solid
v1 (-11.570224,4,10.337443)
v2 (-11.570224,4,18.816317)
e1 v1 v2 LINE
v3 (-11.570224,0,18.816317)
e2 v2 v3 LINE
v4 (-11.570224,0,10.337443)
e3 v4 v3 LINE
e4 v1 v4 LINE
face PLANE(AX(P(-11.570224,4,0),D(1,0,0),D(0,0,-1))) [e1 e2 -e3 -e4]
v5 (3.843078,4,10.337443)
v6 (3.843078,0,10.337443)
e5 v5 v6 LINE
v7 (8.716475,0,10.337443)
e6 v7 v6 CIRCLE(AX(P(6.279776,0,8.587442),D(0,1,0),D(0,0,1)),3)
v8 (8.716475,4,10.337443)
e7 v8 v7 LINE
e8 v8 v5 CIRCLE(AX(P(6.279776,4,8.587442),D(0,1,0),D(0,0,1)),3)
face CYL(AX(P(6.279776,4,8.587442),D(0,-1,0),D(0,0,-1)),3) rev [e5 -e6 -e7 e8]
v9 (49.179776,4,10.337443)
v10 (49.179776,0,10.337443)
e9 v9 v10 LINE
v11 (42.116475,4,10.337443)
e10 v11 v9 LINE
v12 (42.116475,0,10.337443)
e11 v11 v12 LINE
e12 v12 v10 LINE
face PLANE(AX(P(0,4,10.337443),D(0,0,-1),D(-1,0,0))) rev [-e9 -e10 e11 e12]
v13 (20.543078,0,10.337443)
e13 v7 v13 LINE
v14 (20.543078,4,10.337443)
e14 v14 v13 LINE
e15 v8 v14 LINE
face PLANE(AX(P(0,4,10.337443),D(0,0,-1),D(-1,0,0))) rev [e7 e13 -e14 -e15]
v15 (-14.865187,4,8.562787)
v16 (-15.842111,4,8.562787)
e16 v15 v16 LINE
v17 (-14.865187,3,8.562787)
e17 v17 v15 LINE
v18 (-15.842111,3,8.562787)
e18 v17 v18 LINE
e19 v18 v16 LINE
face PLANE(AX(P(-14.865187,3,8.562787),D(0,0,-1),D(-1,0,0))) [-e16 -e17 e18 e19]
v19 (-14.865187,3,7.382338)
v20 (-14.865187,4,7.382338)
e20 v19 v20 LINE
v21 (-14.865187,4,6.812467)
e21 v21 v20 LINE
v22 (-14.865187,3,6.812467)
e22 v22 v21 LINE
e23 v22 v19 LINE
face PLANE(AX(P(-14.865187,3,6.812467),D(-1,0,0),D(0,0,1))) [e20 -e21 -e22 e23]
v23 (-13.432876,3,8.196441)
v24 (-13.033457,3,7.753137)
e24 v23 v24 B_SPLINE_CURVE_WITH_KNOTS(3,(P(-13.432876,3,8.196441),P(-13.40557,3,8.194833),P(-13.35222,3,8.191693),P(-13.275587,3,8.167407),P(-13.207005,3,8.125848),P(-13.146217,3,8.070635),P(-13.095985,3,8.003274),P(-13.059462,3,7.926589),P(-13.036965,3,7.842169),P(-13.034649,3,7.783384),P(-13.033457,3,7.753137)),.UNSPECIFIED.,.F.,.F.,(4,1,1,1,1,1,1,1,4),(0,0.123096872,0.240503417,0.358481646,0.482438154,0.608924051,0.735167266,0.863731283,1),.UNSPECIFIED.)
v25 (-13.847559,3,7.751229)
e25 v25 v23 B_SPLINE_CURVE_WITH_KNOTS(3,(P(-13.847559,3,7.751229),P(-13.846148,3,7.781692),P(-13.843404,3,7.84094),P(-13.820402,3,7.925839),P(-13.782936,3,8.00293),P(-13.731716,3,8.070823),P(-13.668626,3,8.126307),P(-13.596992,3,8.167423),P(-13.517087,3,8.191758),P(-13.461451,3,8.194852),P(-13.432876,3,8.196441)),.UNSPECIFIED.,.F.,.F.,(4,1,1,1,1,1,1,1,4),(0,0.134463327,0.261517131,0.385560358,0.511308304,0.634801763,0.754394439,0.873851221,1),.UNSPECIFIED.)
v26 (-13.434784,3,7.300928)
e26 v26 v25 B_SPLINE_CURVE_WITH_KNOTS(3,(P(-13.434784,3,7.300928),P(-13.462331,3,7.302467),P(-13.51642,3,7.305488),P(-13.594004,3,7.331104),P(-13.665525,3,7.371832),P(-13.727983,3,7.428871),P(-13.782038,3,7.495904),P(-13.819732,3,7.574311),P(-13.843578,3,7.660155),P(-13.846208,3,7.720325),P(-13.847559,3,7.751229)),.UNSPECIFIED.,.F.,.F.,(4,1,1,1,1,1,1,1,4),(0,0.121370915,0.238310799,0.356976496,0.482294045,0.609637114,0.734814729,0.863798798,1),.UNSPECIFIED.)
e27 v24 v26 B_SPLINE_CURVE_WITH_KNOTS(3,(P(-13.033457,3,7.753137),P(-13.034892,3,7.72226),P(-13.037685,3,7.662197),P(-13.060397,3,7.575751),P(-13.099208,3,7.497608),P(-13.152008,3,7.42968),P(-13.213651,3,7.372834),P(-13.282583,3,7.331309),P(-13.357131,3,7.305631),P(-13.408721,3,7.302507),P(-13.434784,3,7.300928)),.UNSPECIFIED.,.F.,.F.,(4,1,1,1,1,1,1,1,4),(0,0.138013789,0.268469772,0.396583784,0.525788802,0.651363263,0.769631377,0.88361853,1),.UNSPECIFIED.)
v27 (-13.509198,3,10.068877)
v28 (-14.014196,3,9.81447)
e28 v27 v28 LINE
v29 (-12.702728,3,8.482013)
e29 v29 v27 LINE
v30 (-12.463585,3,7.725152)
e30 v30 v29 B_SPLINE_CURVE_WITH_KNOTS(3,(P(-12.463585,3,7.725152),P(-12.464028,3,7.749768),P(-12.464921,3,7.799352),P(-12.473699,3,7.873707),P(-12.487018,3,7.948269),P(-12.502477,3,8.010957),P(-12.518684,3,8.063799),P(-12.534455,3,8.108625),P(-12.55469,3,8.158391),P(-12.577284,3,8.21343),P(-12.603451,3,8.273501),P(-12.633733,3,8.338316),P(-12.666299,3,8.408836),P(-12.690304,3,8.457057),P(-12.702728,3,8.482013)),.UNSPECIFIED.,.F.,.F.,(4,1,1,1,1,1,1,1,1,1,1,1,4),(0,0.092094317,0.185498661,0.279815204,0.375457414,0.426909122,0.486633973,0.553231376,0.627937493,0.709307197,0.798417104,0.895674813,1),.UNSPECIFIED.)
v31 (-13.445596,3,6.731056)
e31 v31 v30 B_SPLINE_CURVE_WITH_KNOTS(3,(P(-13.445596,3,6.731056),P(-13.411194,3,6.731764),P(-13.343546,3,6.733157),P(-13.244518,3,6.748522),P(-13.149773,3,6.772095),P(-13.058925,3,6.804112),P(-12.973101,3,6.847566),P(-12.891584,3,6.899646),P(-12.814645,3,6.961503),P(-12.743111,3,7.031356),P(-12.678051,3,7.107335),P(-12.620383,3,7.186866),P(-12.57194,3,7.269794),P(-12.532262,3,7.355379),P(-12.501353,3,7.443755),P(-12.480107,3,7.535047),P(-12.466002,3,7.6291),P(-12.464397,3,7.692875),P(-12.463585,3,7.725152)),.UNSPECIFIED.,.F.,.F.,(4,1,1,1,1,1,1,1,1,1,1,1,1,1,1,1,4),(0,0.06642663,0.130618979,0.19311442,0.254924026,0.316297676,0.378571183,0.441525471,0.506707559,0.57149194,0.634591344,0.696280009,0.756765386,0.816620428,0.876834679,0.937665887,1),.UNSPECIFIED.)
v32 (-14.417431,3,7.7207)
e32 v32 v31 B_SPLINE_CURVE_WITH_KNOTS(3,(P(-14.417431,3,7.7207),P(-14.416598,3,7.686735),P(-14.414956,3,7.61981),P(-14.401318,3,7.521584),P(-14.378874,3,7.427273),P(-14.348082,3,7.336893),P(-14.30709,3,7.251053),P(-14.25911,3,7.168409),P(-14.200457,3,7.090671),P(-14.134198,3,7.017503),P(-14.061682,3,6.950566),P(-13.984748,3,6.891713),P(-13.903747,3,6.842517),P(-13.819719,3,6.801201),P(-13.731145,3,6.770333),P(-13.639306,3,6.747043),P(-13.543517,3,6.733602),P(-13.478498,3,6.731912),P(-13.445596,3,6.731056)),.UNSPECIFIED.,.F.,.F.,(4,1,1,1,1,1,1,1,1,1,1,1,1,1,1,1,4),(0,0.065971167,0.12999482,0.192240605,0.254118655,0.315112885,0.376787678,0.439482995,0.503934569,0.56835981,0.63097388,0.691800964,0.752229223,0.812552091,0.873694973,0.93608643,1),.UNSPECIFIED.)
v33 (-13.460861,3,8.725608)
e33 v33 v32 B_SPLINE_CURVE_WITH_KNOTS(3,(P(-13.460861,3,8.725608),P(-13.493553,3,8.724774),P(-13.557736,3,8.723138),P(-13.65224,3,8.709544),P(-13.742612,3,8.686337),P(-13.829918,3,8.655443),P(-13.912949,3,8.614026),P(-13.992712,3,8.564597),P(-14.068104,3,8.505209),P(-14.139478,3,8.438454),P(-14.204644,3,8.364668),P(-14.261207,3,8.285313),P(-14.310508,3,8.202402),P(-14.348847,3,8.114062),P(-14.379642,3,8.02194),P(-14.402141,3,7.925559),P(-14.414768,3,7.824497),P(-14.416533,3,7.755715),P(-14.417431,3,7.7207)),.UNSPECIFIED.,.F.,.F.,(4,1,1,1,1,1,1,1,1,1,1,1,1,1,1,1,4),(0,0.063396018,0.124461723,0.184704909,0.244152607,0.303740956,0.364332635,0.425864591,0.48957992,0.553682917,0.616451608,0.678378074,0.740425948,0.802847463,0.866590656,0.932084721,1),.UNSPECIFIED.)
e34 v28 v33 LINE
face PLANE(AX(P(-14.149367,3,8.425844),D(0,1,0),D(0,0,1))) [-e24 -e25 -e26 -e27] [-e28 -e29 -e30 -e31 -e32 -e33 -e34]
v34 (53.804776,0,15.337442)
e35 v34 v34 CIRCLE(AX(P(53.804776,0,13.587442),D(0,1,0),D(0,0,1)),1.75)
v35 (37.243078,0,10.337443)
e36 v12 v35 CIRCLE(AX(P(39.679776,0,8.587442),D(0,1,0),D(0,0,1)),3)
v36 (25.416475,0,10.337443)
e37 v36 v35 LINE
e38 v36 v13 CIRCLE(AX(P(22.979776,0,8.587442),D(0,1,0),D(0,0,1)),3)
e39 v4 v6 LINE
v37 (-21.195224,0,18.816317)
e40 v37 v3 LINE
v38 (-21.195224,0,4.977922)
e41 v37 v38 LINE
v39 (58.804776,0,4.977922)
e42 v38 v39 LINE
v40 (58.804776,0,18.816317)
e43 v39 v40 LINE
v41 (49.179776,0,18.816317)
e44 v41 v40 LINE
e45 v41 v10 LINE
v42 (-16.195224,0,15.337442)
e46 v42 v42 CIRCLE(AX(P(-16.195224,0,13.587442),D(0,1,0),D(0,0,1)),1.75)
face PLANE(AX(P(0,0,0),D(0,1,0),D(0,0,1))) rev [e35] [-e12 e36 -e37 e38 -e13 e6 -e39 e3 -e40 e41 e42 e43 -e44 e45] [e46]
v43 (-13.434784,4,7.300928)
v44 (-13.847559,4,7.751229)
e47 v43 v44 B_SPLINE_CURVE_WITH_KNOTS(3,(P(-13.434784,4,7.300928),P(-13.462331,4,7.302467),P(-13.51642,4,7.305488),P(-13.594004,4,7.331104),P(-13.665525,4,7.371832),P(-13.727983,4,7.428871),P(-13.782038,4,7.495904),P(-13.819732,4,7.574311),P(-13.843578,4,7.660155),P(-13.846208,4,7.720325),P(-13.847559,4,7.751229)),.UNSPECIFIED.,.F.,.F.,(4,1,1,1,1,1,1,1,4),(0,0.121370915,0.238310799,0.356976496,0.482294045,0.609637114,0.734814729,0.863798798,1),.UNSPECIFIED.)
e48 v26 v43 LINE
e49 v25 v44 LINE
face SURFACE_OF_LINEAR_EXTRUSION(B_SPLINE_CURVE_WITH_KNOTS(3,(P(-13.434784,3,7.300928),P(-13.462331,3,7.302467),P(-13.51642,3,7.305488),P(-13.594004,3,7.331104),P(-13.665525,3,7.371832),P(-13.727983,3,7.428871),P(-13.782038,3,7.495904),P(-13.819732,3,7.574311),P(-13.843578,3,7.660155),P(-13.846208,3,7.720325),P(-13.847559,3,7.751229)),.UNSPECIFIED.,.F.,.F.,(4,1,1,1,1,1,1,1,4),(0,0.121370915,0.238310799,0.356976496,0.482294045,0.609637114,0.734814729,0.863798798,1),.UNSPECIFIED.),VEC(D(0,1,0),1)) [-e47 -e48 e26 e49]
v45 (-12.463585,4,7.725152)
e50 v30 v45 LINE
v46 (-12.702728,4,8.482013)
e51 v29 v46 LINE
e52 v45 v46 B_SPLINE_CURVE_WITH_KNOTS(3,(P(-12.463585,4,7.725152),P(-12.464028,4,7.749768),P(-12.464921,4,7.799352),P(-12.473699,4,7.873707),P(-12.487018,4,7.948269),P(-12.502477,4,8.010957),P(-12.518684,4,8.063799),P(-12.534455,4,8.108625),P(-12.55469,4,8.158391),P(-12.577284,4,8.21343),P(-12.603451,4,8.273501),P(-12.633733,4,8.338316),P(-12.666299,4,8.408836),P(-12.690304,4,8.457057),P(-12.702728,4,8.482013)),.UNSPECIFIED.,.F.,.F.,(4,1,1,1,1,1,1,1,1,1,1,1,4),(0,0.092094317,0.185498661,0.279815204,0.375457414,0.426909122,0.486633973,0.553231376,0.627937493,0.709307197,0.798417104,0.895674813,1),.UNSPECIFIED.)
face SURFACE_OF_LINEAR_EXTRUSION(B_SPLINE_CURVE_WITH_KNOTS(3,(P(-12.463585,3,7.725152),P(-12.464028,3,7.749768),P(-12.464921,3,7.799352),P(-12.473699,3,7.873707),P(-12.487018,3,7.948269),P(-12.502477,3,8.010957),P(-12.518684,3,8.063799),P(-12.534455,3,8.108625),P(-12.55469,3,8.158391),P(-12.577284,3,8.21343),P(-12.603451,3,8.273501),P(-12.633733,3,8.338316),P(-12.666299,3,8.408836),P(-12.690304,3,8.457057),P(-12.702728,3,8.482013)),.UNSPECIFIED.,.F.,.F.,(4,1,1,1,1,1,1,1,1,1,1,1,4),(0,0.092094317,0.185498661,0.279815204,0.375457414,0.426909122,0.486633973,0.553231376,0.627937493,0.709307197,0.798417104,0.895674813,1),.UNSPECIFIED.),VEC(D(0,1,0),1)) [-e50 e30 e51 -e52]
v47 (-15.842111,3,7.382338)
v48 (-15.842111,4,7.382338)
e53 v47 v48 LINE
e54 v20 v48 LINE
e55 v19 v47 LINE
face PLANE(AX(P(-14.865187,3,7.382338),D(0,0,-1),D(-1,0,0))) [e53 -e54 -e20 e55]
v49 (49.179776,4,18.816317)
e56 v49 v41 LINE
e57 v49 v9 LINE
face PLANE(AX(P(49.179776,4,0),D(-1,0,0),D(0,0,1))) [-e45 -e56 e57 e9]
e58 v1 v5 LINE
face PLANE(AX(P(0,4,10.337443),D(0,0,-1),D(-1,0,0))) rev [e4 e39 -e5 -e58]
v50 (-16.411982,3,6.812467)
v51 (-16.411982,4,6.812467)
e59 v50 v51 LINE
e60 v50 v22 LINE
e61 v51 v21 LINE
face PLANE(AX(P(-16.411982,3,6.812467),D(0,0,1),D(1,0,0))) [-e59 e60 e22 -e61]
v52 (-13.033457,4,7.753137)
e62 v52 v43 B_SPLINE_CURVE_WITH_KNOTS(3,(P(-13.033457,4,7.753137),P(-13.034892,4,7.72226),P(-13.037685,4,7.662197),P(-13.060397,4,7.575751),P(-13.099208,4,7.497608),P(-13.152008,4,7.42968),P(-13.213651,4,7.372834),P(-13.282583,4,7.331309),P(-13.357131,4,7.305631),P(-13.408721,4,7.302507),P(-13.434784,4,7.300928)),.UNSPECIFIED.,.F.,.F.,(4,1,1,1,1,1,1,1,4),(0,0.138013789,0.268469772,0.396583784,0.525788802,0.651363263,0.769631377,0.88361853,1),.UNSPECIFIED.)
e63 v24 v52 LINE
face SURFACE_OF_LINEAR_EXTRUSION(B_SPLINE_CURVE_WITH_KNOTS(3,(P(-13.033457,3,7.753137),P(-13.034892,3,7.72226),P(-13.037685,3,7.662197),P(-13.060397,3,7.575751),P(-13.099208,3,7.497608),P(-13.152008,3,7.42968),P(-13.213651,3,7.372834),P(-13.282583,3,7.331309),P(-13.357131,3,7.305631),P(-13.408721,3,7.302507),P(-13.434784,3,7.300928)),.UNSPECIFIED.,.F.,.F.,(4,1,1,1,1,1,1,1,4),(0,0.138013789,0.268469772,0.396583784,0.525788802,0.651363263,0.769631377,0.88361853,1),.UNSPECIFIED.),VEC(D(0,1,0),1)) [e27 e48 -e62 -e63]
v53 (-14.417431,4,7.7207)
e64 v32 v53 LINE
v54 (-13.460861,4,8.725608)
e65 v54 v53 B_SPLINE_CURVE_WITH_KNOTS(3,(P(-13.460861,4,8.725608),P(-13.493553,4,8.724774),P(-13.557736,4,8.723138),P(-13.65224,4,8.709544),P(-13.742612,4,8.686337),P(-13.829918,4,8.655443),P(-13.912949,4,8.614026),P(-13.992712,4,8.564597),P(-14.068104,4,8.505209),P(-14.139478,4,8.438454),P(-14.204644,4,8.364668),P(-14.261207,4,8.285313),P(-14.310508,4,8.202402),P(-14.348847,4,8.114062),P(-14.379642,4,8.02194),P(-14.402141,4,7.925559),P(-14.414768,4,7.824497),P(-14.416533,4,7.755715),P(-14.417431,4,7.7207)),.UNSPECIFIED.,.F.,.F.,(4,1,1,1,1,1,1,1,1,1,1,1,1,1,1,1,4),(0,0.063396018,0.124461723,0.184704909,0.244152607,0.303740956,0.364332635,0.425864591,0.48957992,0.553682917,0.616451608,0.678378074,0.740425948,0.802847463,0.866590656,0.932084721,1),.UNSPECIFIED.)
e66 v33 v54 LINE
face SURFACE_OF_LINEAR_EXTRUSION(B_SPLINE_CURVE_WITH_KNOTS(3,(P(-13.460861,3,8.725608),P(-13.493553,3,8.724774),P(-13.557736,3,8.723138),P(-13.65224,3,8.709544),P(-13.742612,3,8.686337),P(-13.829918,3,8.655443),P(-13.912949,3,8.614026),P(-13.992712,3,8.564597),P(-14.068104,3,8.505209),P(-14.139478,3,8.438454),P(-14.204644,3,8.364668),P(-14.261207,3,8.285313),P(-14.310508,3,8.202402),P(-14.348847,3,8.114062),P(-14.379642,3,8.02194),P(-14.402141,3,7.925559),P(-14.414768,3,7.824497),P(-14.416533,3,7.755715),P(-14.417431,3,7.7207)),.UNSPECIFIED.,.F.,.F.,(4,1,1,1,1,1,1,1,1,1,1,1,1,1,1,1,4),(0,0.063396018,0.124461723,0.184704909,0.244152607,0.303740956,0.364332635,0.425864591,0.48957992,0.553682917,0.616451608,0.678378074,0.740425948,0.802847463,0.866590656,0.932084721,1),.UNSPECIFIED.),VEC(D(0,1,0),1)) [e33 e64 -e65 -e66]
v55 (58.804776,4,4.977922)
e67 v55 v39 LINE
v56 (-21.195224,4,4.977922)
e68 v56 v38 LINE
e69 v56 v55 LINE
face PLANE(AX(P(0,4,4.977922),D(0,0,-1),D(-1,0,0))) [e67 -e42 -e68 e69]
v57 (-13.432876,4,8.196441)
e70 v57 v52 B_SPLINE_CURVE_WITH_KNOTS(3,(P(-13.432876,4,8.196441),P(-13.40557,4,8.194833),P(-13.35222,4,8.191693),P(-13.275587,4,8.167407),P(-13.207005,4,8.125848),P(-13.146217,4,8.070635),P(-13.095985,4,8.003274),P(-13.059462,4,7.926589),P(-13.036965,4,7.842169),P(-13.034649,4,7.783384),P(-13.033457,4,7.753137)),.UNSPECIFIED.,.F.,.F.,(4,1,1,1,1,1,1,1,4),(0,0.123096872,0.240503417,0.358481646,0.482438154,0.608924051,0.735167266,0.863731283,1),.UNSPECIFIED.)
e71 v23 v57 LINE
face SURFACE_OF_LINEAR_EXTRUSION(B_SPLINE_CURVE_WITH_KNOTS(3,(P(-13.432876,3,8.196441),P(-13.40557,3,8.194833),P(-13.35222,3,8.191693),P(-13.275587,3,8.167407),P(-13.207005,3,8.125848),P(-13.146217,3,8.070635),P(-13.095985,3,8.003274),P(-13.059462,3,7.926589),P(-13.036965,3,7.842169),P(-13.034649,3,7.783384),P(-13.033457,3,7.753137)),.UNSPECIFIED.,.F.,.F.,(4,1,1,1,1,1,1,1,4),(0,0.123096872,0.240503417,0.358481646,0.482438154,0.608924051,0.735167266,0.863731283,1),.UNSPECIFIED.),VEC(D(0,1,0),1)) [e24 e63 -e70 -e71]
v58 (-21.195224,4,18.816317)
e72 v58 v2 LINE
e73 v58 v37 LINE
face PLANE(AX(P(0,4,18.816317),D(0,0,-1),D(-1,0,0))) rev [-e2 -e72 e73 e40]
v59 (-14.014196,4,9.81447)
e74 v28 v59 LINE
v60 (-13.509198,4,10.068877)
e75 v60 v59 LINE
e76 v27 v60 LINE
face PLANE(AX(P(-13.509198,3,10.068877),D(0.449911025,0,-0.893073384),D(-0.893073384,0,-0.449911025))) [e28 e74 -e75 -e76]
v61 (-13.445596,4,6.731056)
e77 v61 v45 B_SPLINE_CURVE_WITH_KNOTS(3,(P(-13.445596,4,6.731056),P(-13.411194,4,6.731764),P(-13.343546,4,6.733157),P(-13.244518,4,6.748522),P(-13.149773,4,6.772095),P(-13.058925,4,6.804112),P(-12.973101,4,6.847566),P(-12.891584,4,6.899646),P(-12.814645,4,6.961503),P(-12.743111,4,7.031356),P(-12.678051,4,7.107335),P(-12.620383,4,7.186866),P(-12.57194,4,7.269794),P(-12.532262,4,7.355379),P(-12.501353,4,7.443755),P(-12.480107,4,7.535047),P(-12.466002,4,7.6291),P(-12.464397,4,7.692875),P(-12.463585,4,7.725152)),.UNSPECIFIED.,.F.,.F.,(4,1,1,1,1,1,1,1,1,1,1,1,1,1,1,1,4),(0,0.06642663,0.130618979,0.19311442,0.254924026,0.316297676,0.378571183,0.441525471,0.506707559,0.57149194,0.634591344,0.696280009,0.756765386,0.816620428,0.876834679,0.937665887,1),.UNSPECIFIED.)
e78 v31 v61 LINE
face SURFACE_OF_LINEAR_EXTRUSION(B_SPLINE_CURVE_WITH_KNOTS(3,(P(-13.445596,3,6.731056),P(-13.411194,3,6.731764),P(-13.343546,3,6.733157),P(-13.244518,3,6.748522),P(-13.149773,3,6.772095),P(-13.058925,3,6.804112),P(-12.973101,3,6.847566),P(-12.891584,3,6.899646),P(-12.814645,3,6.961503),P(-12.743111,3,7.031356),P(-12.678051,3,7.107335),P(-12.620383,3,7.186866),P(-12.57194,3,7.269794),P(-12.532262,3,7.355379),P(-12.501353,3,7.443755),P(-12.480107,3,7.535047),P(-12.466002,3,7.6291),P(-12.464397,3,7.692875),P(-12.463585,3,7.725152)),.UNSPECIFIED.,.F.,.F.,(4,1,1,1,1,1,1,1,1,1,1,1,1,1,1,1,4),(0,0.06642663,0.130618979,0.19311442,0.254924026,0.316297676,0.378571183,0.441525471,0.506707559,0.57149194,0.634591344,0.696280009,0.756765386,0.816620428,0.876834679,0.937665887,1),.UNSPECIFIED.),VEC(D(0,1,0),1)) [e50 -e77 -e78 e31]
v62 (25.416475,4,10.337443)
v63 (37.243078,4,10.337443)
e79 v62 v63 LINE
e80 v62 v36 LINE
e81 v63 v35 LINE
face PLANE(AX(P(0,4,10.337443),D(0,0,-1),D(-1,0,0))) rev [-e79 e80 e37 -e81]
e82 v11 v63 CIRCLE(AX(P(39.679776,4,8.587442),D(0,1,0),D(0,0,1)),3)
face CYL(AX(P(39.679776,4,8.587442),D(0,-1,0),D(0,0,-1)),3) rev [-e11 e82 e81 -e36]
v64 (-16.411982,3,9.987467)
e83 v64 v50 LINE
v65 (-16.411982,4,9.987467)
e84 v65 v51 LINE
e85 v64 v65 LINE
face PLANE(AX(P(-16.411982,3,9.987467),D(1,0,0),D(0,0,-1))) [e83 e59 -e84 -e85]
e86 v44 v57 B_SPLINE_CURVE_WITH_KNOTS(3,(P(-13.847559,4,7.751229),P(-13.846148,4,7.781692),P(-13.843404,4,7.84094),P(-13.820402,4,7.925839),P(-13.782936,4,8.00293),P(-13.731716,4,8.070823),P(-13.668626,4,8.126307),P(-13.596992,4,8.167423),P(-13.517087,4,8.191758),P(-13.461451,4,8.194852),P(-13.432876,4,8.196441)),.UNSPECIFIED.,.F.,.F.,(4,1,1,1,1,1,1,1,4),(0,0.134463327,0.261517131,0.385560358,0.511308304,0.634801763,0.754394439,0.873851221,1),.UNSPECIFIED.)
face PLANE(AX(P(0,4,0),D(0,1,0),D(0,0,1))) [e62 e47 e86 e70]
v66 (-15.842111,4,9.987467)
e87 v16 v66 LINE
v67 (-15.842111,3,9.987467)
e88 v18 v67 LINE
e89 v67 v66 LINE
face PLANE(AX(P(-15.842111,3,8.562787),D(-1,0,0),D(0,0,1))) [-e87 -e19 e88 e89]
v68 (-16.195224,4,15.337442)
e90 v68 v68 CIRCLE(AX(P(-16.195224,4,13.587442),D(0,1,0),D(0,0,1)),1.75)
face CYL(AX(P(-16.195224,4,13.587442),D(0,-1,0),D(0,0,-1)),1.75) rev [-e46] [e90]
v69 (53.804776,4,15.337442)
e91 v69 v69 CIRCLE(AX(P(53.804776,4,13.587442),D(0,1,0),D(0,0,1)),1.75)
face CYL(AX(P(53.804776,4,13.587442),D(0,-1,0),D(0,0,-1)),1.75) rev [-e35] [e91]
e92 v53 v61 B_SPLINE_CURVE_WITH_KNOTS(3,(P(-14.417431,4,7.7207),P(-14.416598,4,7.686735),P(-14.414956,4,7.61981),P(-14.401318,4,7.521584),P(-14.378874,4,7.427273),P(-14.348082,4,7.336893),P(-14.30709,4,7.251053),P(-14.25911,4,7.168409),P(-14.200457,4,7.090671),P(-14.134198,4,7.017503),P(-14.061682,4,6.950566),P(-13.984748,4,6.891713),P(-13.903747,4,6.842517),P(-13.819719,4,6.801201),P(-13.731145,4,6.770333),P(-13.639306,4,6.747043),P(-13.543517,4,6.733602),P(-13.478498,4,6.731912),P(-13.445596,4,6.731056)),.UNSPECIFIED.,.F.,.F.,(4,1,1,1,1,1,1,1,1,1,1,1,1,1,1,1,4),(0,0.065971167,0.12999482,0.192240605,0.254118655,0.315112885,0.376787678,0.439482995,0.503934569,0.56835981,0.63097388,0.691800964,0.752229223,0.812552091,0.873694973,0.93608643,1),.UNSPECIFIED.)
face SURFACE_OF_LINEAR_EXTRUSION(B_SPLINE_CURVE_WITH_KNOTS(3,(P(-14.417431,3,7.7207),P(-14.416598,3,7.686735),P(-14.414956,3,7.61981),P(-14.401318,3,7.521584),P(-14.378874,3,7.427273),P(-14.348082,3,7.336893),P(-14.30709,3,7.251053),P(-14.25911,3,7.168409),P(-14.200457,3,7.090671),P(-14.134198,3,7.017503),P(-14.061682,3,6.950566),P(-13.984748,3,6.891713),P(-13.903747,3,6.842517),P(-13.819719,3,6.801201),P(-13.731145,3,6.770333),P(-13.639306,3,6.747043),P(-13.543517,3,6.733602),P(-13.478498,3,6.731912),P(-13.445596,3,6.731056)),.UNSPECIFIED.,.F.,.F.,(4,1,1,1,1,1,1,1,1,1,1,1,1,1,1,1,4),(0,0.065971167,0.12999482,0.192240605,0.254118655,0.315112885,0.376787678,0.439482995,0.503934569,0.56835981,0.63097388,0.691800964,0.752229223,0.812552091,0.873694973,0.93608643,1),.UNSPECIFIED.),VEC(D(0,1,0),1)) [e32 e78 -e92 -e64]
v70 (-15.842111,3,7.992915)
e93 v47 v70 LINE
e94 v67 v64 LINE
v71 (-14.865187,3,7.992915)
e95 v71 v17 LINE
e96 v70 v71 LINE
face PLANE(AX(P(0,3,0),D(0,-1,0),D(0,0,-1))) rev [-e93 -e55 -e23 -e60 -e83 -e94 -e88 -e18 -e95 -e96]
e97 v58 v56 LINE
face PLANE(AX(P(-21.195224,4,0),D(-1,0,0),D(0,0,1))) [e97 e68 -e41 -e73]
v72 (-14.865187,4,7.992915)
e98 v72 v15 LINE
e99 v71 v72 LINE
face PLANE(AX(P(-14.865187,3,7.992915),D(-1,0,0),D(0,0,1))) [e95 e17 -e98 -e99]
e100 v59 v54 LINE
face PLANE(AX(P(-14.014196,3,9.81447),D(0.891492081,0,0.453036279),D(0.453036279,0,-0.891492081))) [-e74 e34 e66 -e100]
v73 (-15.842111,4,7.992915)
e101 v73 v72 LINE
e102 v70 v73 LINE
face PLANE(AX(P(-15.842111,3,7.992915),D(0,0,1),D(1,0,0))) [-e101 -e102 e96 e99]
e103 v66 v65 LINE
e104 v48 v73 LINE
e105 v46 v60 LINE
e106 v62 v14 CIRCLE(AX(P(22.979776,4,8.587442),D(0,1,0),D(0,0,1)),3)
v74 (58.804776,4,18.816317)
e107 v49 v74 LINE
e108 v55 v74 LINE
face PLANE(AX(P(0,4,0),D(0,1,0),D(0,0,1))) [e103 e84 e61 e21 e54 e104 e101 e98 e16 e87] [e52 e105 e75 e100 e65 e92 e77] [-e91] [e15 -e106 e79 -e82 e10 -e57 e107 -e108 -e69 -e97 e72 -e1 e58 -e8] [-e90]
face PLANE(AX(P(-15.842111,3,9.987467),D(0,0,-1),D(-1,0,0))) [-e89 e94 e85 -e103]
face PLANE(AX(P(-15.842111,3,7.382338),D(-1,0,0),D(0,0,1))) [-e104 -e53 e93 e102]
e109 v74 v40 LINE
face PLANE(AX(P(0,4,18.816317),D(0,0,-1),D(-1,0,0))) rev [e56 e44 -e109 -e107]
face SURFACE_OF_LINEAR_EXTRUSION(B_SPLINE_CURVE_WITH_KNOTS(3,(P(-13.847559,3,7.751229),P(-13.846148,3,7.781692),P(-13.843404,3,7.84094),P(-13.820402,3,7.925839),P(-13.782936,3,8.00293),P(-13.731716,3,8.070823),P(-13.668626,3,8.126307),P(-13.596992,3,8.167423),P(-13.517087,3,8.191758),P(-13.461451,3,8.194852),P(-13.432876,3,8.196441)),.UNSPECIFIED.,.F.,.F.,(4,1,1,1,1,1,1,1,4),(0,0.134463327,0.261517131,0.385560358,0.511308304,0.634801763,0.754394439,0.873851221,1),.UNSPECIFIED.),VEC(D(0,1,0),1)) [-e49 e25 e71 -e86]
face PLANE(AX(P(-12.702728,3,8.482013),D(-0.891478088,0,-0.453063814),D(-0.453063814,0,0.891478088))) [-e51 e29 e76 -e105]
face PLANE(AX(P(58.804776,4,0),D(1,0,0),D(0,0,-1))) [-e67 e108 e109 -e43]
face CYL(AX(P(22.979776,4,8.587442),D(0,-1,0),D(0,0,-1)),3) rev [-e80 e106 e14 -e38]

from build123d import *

# Parameters (mm, degrees)
BOSS_EXTRUDE1_OUTLINE_R = 1.75
BOSS_EXTRUDE1_DEPTH     = 4
CUT_EXTRUDE1_DEPTH      = 1


# Read off the part's stored shape, not the designer's step: Boss-Extrude1
with BuildPart() as part:
    # Boss-Extrude1 outline → Boss-Extrude1 (new body)
    with BuildSketch(Plane(origin=(0, 0, 0), x_dir=(1, 0, 0), z_dir=(0, 1, 0))):
        with BuildLine():
            Line((25.416474615, -10.33744254), (37.24307775, -10.33744254))
            ThreePointArc((37.24307775, -10.33744254), (39.679776182, -5.587442326), (42.116474615, -10.33744254))
            Line((42.116474615, -10.33744254), (49.179776182, -10.33744254))
            Line((49.179776182, -10.33744254), (49.179776182, -18.81631662))
            Line((49.179776182, -18.81631662), (58.804776182, -18.81631662))
            Line((58.804776182, -18.81631662), (58.804776182, -4.977921711))
            Line((58.804776182, -4.977921711), (-21.195223818, -4.977921711))
            Line((-21.195223818, -4.977921711), (-21.195223818, -18.81631662))
            Line((-21.195223818, -18.81631662), (-11.570223818, -18.81631662))
            Line((-11.570223818, -18.81631662), (-11.570223818, -10.33744254))
            Line((-11.570223818, -10.33744254), (3.84307775, -10.33744254))
            ThreePointArc((3.84307775, -10.33744254), (6.279776182, -5.587442326), (8.716474615, -10.33744254))
            Line((8.716474615, -10.33744254), (20.54307775, -10.33744254))
            ThreePointArc((20.54307775, -10.33744254), (22.979776182, -5.587442326), (25.416474615, -10.33744254))
        make_face()
        with Locations((-16.195223818, -13.587442433)):
            Circle(BOSS_EXTRUDE1_OUTLINE_R, mode=Mode.SUBTRACT)
        with Locations((53.804776182, -13.587442433)):
            Circle(BOSS_EXTRUDE1_OUTLINE_R, mode=Mode.SUBTRACT)
    extrude(amount=BOSS_EXTRUDE1_DEPTH)

    # Sketch2 → Cut-Extrude1 (cut)
    # profile 1 of 2: a face of its own
    with BuildSketch(Plane(origin=(0, 4, 0), x_dir=(1, 0, 0), z_dir=(0, 1, 0))):
        Polygon((-16.41198232, -6.812466594), (-14.865187448, -6.812466594), (-14.865187448, -7.382338389), (-15.842110525, -7.382338389), (-15.842110525, -7.992915312), (-14.865187448, -7.992915312), (-14.865187448, -8.562787107), (-15.842110525, -8.562787107), (-15.842110525, -9.987466594), (-16.41198232, -9.987466594), align=None)
    # profile 2 of 2: a face of its own
    with BuildSketch(Plane(origin=(0, 4, 0), x_dir=(1, 0, 0), z_dir=(0, 1, 0))):
        with BuildLine():
            Line((-13.509197865, -10.06887685), (-14.014195862, -9.814469799))
            Line((-14.014195862, -9.814469799), (-13.460860525, -8.725607619))
            add(Edge.make_bspline(
                [(-13.460860525, -8.725607619), (-13.493552847, -8.724774336), (-13.557735785, -8.723138398), (-13.652240154, -8.70954377), (-13.742612406, -8.686336872), (-13.829917734, -8.655442645), (-13.912948731, -8.614025733), (-13.992712215, -8.564596821), (-14.068103991, -8.505208694), (-14.139477538, -8.438453984), (-14.204643867, -8.364668422), (-14.261206862, -8.285313298), (-14.310508019, -8.20240162), (-14.348847302, -8.114061596), (-14.37964161, -8.021939666), (-14.402141484, -7.925558996), (-14.414767818, -7.82449673), (-14.416532622, -7.755714857), (-14.417431038, -7.720699767)],
                knots=[0, 0, 0, 0, 1.014336294, 1.991387562, 2.955278539, 3.906441712, 4.859855302, 5.829322156, 6.813833455, 7.833278715, 8.858926674, 9.863225732, 10.85404919, 11.846815163, 12.845559416, 13.865450493, 14.913355531, 16, 16, 16, 16], degree=3))
            add(Edge.make_bspline(
                [(-14.417431038, -7.720699767), (-14.416597708, -7.686735475), (-14.414955648, -7.619809541), (-14.40131818, -7.521584049), (-14.378874437, -7.427273226), (-14.348082426, -7.336893095), (-14.307090423, -7.251053103), (-14.259110328, -7.168409197), (-14.200456838, -7.09067119), (-14.134198348, -7.017502553), (-14.061681947, -6.950566169), (-13.984748133, -6.89171273), (-13.903746713, -6.84251691), (-13.819718635, -6.801201496), (-13.73114503, -6.77033319), (-13.639305886, -6.747043281), (-13.543517063, -6.733601675), (-13.478497608, -6.731911573), (-13.445596102, -6.731056337)],
                knots=[0, 0, 0, 0, 1.055538678, 2.079917126, 3.075849687, 4.065898488, 5.041806164, 6.028602842, 7.031727914, 8.062953097, 9.093756959, 10.095582084, 11.068815425, 12.035667573, 13.000833448, 13.979119574, 14.977382875, 16, 16, 16, 16], degree=3))
            add(Edge.make_bspline(
                [(-13.445596102, -6.731056337), (-13.411193598, -6.731764476), (-13.343545729, -6.733156934), (-13.244518332, -6.748522162), (-13.149772928, -6.772095231), (-13.058924549, -6.804112269), (-12.97310104, -6.847566016), (-12.891584275, -6.899645635), (-12.814645404, -6.96150342), (-12.743110693, -7.03135644), (-12.678050673, -7.107334669), (-12.620383061, -7.186865545), (-12.571939818, -7.269793563), (-12.532261839, -7.355378619), (-12.501352894, -7.443754793), (-12.480106932, -7.535047442), (-12.466001971, -7.629100452), (-12.464397107, -7.692875343), (-12.463584884, -7.72515189)],
                knots=[0, 0, 0, 0, 1.062826075, 2.08990367, 3.089830715, 4.078784409, 5.060762809, 6.057138927, 7.064407536, 8.107320944, 9.143871033, 10.153461498, 11.140480137, 12.108246174, 13.065926856, 14.029354859, 15.002654194, 16, 16, 16, 16], degree=3))
            add(Edge.make_bspline(
                [(-12.463584884, -7.72515189), (-12.464028122, -7.749768446), (-12.464920902, -7.799351725), (-12.473699398, -7.873707226), (-12.487018143, -7.94826881), (-12.502477367, -8.01095661), (-12.518684213, -8.063798617), (-12.534455319, -8.108625261), (-12.554690113, -8.158391252), (-12.577284282, -8.213430161), (-12.60345099, -8.273500634), (-12.633732754, -8.338315513), (-12.666299428, -8.408836066), (-12.690304282, -8.45705706), (-12.702727513, -8.482012868)],
                knots=[0, 0, 0, 0, 1.105131805, 2.225983929, 3.357782449, 4.505488967, 5.122909461, 5.839607681, 6.638776516, 7.535249922, 8.51168636, 9.581005249, 10.748097757, 12, 12, 12, 12], degree=3))
            Line((-12.702727513, -8.482012868), (-13.509197865, -10.06887685))
        make_face()
        with BuildLine():
            add(Edge.make_bspline(
                [(-13.43287575, -8.196440953), (-13.405569868, -8.194833376), (-13.352220356, -8.191692536), (-13.275587332, -8.16740689), (-13.207004671, -8.125847553), (-13.146217368, -8.07063542), (-13.095984603, -8.003274093), (-13.059462095, -7.92658921), (-13.036965354, -7.84216883), (-13.034648703, -7.783384123), (-13.033456679, -7.753136666)],
                knots=[0, 0, 0, 0, 0.984774978, 1.924027336, 2.867853169, 3.859505234, 4.871392407, 5.881338128, 6.909850265, 8, 8, 8, 8], degree=3))
            add(Edge.make_bspline(
                [(-13.033456679, -7.753136666), (-13.034892342, -7.722259992), (-13.03768505, -7.66219749), (-13.0603973, -7.575750698), (-13.099207968, -7.497607925), (-13.152007661, -7.429680335), (-13.213650613, -7.37283362), (-13.282582994, -7.331308626), (-13.357130982, -7.305630901), (-13.408720798, -7.302506546), (-13.434783803, -7.300928132)],
                knots=[0, 0, 0, 0, 1.104110315, 2.147758178, 3.172670271, 4.206310416, 5.210906102, 6.157051016, 7.068948237, 8, 8, 8, 8], degree=3))
            add(Edge.make_bspline(
                [(-13.434783803, -7.300928132), (-13.462330936, -7.302466882), (-13.516419507, -7.305488204), (-13.594004346, -7.331104267), (-13.665525389, -7.371831843), (-13.72798309, -7.428871436), (-13.782037835, -7.495904441), (-13.819731685, -7.574310981), (-13.843578121, -7.660154514), (-13.846208342, -7.720324727), (-13.847559243, -7.751228613)],
                knots=[0, 0, 0, 0, 0.970967322, 1.90648639, 2.855811969, 3.858352357, 4.877096915, 5.878517833, 6.91039038, 8, 8, 8, 8], degree=3))
            add(Edge.make_bspline(
                [(-13.847559243, -7.751228613), (-13.846148143, -7.781691987), (-13.8434037, -7.840940069), (-13.820402477, -7.92583923), (-13.782935789, -8.002929935), (-13.731716155, -8.070822503), (-13.668626178, -8.126306671), (-13.596992367, -8.167423317), (-13.517086507, -8.191758387), (-13.461451298, -8.194852), (-13.43287575, -8.196440953)],
                knots=[0, 0, 0, 0, 1.075706617, 2.092137047, 3.084482865, 4.090466434, 5.0784141, 6.035155512, 6.990809768, 8, 8, 8, 8], degree=3))
        make_face(mode=Mode.SUBTRACT)
    extrude(amount=-CUT_EXTRUDE1_DEPTH, mode=Mode.SUBTRACT)


solid = part.part
